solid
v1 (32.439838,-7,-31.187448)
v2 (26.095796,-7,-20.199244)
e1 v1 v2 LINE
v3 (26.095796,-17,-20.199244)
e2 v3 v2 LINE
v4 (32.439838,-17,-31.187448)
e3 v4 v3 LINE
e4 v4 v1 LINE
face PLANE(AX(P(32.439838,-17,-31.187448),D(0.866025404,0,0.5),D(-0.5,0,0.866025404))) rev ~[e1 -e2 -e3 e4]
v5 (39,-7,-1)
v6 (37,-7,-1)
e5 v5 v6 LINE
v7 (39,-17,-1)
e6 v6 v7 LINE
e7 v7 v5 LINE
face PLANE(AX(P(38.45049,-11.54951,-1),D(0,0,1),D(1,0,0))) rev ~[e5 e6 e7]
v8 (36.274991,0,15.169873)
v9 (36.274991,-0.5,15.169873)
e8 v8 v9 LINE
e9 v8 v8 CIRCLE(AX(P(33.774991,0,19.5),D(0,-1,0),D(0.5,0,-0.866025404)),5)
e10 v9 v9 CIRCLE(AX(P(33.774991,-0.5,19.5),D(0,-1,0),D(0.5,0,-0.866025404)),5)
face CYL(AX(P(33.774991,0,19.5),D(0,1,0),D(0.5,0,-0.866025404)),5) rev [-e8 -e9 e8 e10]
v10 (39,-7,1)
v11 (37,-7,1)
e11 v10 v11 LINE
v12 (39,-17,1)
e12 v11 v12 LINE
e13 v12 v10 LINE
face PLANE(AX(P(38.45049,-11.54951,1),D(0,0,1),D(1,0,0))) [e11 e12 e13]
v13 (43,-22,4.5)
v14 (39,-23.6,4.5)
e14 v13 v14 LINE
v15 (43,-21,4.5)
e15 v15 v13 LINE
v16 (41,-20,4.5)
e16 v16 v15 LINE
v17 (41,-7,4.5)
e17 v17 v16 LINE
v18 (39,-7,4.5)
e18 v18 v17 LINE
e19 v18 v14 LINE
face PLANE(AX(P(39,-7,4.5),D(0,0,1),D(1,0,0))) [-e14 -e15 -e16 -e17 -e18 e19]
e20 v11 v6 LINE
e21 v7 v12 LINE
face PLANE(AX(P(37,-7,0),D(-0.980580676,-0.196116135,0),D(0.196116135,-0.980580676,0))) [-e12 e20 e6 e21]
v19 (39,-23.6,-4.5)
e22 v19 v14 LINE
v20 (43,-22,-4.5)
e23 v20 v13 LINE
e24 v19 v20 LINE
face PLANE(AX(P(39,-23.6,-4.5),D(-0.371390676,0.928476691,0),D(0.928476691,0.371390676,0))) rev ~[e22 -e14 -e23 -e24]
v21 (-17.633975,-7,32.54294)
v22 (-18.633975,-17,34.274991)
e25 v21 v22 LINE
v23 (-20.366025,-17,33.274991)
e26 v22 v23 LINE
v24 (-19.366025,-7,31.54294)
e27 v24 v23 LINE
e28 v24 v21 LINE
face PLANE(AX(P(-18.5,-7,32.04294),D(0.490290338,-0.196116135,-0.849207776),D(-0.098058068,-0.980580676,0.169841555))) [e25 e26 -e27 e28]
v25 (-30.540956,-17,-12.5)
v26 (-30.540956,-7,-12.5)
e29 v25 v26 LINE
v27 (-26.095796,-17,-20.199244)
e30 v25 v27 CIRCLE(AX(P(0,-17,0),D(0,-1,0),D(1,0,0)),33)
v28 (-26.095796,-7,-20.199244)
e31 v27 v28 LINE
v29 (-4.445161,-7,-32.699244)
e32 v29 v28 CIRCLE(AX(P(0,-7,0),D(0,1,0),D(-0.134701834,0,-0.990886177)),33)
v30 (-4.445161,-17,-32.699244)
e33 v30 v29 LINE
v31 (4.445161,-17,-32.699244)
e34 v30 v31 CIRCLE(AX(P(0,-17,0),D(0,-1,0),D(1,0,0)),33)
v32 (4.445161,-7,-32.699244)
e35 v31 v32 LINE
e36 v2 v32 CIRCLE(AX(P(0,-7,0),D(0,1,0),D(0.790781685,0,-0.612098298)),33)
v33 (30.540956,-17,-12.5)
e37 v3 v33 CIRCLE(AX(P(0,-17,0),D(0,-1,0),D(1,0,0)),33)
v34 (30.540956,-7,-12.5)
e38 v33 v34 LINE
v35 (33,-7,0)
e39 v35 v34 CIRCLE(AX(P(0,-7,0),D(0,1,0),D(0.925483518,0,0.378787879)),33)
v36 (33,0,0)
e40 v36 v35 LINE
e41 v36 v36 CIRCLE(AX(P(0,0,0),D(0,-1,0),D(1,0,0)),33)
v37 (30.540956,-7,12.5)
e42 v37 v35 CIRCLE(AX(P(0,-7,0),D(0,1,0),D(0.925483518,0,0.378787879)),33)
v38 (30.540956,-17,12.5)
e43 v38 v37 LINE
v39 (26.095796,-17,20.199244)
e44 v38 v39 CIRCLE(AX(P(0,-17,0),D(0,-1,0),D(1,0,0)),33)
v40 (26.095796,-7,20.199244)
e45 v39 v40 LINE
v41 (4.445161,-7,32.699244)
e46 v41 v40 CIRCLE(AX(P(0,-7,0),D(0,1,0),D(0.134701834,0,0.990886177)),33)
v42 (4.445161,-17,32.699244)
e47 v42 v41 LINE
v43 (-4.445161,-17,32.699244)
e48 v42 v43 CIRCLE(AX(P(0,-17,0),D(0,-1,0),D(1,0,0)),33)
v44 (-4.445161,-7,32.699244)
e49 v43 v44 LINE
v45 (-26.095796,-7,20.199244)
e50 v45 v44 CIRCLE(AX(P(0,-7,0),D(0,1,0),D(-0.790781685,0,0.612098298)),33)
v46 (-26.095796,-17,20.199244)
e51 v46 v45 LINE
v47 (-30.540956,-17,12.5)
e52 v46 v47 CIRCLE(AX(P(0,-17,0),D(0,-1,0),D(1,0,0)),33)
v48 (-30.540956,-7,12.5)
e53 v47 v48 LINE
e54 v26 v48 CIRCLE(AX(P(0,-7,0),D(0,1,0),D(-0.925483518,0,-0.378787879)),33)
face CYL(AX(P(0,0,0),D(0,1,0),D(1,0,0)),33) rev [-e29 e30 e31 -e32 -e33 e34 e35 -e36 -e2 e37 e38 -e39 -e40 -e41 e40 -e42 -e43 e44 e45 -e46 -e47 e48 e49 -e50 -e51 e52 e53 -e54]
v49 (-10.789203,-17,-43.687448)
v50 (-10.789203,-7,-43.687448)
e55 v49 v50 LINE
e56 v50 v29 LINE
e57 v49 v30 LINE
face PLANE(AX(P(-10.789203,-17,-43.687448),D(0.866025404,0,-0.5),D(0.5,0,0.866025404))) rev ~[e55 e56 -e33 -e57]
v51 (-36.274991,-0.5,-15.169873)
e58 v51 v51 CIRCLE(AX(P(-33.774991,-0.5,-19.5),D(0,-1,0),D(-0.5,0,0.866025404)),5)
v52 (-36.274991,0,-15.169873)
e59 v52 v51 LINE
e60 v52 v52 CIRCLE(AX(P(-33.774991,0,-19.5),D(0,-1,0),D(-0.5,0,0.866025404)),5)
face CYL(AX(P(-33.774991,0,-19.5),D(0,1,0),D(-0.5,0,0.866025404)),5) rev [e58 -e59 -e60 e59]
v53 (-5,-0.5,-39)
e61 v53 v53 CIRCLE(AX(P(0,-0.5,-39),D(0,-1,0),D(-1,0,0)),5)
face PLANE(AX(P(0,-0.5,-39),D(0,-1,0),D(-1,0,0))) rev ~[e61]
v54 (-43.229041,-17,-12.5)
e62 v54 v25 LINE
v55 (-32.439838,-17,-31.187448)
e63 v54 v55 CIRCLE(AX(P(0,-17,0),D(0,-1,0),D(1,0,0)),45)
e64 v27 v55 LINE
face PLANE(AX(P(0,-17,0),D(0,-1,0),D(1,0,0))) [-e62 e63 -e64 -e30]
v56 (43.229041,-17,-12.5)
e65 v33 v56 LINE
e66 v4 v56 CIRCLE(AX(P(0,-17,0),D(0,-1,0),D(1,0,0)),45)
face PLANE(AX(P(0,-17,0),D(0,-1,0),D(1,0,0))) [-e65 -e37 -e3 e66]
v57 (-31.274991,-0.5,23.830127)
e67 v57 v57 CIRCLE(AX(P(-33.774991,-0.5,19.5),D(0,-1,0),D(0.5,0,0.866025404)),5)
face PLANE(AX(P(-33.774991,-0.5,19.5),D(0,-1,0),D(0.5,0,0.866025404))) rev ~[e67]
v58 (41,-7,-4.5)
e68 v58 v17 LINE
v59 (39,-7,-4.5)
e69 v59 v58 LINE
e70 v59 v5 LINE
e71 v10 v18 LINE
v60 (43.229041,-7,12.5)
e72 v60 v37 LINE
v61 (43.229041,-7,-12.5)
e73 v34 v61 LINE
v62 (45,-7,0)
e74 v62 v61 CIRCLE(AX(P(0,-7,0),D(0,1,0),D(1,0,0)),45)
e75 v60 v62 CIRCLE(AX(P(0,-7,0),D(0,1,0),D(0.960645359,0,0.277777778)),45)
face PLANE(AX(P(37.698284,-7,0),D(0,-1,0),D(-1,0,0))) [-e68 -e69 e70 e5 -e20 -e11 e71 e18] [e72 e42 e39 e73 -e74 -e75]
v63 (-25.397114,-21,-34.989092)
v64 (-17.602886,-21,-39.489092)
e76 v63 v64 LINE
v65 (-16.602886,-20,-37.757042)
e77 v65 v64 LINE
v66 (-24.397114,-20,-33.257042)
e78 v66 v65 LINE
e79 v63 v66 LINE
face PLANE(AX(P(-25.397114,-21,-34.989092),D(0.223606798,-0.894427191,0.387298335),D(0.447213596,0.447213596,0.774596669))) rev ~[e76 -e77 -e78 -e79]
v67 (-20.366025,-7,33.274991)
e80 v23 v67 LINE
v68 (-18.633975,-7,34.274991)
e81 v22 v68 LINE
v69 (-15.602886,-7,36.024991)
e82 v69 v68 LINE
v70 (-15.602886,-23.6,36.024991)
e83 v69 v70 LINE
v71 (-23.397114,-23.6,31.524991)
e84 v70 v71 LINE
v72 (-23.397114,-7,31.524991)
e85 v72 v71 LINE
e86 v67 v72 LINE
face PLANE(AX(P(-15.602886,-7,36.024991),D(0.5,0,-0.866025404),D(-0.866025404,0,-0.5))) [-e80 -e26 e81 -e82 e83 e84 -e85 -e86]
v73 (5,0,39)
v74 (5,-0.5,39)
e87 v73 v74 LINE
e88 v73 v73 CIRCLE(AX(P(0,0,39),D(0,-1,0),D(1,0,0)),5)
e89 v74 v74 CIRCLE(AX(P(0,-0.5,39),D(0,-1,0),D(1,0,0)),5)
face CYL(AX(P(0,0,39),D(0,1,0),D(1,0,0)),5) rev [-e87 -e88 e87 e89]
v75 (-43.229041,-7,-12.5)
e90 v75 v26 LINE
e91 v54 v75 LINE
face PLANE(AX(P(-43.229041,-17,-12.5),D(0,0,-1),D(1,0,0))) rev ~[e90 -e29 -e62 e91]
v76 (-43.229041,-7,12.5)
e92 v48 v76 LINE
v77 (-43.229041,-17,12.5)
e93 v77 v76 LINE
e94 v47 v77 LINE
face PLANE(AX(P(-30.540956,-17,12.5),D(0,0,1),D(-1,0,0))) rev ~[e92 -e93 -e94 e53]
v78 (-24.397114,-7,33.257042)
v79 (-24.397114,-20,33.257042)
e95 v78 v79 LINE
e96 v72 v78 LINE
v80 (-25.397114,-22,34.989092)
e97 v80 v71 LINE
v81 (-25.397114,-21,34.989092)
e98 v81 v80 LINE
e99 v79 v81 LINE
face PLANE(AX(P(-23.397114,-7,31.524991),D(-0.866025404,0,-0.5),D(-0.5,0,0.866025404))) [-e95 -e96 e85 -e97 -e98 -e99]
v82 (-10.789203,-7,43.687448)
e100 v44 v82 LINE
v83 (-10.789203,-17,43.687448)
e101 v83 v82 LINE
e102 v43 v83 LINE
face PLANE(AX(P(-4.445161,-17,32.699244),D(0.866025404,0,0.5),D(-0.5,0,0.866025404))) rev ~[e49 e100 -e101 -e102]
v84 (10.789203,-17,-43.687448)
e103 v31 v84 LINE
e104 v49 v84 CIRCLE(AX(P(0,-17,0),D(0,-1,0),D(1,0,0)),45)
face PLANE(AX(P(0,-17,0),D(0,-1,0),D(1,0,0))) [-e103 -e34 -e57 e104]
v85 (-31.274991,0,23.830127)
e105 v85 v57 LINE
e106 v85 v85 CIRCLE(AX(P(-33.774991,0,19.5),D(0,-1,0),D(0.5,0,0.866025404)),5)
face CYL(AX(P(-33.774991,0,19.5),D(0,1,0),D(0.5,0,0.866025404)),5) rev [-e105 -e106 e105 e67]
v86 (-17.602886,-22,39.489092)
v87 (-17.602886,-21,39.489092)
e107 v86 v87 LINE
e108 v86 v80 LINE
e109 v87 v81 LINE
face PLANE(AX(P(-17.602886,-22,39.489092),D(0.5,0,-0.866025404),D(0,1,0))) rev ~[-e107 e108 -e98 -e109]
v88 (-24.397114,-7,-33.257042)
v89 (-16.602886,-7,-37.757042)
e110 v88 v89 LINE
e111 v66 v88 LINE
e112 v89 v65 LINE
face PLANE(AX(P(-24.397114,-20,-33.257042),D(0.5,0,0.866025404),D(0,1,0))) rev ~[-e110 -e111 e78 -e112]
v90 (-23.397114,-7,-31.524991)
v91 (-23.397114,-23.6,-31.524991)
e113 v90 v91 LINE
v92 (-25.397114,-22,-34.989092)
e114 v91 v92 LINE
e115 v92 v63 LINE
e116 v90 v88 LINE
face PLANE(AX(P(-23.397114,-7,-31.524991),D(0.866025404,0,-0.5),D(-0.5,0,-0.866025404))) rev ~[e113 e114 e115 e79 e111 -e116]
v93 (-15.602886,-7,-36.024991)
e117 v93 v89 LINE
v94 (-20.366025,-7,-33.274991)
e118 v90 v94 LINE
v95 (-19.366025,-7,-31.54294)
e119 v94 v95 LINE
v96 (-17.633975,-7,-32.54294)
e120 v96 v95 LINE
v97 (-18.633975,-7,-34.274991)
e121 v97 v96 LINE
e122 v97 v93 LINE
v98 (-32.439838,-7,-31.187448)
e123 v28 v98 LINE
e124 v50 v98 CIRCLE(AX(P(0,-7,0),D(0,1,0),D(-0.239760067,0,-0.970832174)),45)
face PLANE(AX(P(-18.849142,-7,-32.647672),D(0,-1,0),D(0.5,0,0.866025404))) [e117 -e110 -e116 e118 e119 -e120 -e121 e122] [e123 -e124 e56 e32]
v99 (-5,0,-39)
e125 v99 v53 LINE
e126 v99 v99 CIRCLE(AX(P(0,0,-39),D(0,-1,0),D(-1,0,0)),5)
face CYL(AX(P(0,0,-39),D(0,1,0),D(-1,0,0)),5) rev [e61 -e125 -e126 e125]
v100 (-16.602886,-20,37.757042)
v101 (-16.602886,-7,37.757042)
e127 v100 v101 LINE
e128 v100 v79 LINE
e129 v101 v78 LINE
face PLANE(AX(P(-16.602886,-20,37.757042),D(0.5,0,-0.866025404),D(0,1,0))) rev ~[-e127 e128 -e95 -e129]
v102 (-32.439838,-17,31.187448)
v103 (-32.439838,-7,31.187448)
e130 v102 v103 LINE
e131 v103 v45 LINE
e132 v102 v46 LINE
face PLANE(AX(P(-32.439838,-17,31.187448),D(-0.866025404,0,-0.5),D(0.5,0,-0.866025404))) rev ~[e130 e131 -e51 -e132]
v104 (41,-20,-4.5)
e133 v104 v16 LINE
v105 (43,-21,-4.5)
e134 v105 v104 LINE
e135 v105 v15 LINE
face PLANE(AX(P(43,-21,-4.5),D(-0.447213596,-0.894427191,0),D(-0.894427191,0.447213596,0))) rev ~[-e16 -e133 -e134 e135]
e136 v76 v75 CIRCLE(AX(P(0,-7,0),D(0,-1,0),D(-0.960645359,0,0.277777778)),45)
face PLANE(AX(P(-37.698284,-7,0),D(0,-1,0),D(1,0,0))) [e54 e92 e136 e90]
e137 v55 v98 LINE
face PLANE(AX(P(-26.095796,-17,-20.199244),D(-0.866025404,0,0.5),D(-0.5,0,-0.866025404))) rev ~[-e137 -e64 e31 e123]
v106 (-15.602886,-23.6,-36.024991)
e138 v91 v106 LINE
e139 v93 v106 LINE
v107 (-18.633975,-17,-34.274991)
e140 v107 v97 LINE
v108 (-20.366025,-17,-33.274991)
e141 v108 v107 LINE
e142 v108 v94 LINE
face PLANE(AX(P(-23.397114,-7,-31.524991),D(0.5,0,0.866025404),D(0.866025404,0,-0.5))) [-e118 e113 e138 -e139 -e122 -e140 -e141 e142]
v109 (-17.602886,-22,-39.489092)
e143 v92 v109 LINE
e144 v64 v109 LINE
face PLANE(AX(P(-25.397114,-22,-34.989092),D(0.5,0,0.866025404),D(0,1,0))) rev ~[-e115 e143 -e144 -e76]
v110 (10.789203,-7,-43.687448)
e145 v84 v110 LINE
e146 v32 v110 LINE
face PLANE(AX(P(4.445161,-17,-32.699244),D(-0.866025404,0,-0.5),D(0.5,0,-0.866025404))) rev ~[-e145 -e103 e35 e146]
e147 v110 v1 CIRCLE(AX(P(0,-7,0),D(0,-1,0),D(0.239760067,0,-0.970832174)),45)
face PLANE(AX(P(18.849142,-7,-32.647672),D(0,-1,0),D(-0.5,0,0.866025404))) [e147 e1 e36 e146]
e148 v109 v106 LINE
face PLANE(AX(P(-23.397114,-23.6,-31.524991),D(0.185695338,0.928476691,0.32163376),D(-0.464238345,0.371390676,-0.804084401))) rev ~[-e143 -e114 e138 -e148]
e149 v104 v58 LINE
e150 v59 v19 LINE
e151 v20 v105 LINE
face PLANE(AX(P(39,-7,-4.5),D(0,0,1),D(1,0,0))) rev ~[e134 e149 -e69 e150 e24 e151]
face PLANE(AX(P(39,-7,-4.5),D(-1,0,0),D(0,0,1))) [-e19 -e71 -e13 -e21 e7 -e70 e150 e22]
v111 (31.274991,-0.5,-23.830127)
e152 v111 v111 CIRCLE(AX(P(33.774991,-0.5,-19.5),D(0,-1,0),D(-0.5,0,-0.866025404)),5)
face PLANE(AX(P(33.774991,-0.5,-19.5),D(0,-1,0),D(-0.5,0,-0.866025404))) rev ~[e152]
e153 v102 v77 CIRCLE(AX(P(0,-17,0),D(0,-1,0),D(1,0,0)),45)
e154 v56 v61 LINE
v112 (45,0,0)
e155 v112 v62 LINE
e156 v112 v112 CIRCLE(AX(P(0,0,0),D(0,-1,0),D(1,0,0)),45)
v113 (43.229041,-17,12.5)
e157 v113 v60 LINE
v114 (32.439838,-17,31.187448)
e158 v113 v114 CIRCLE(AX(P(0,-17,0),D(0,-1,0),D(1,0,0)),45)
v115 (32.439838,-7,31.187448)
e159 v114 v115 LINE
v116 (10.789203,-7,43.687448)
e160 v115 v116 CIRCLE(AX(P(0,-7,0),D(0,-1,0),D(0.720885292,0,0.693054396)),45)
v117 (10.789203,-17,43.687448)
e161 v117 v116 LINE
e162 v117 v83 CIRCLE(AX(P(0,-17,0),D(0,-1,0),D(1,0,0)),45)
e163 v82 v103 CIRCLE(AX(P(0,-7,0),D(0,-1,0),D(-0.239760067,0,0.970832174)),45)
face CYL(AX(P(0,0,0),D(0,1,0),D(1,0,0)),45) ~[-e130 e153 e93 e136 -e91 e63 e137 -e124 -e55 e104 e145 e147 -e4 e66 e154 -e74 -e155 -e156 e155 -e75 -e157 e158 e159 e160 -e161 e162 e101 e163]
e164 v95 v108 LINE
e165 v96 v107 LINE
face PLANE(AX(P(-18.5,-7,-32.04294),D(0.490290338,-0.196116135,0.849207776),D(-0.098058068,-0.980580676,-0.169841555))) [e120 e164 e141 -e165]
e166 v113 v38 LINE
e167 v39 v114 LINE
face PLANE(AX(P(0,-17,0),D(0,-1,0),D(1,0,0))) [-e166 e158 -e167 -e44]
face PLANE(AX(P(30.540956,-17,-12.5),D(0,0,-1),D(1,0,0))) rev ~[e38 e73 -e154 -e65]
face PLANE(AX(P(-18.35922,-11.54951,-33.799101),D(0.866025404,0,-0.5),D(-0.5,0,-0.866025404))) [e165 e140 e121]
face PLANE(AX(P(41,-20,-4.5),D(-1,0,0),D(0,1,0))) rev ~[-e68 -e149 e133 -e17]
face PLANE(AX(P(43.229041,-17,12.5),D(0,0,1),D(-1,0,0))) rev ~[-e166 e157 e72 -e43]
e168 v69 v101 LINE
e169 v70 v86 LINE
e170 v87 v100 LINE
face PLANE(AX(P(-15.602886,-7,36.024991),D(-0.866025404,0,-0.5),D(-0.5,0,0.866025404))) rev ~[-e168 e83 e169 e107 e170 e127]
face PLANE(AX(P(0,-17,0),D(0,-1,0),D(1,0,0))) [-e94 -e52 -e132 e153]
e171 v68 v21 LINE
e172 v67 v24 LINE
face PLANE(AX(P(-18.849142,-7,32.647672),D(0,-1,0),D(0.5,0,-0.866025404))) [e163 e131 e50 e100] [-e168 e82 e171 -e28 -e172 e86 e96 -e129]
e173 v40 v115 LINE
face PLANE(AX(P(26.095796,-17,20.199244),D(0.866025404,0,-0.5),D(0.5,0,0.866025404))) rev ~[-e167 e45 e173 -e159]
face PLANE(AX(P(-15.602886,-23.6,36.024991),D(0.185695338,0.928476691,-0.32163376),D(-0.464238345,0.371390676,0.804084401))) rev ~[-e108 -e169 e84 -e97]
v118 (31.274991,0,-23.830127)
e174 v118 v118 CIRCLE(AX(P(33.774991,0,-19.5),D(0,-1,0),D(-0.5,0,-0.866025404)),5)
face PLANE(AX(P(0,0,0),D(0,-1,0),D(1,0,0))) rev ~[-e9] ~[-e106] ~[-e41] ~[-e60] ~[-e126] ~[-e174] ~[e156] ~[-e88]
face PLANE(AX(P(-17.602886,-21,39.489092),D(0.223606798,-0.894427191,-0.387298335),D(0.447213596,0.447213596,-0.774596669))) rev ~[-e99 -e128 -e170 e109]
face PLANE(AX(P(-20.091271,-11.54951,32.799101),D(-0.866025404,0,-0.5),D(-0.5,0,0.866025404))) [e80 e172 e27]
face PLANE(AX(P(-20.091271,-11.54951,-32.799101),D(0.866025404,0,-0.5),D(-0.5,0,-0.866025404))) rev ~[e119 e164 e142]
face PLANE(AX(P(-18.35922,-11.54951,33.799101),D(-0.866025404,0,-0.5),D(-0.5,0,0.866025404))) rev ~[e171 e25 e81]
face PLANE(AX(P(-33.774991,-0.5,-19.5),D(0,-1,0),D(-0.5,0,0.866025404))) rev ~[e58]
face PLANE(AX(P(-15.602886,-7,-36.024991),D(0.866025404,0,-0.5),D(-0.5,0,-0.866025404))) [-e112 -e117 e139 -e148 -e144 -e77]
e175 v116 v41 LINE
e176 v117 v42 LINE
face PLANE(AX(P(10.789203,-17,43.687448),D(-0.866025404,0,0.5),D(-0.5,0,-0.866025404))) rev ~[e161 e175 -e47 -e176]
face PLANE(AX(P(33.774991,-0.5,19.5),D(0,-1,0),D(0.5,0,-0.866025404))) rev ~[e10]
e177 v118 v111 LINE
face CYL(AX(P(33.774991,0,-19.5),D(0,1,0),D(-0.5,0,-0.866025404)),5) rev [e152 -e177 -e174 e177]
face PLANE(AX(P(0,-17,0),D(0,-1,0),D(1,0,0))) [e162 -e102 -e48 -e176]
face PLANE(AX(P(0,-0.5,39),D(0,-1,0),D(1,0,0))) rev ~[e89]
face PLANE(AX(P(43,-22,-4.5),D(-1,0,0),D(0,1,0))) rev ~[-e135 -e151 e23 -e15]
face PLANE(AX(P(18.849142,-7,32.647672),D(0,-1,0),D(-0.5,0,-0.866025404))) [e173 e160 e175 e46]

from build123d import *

# Parameters (mm, degrees)
F0_R             = 45
F0_R_2           = 33
F1_DEPTH         = 17
F2_R             = 5
F3_DEPTH         = 0.5
F3_COPIES_COUNT  = 6
F6_DEPTH         = 10
F8_COUNT         = 6
F9_W             = 6
F9_H             = 9
F10_DEPTH        = 17
F10_COPIES_COUNT = 3
F12_DEPTH        = 10
F12_COPIES_COUNT = 3
F14_DEPTH        = 1
F14_COPIES_COUNT = 3


# Not quite as in the source:
# - a pattern or mirror of a feature is missing from the dataset's text; its kind, count and spacing are read off the source's solid
# - a feature names something its author has since deleted; it is built from what else it names


with BuildPart() as f1:
    # F0 (on Front) → F1 (new body)
    with BuildSketch(Plane.XZ):
        Circle(F0_R)
        Circle(F0_R_2, mode=Mode.SUBTRACT)
    extrude(amount=F1_DEPTH)

    # F2 (on Front) → F3 (cut)
    with BuildSketch(Plane.XZ):
        with Locations((0, 39)):
            Circle(F2_R)
    f3 = extrude(amount=F3_DEPTH, mode=Mode.SUBTRACT)

    # F3_copies: F3 ×6 about axis
    f3_copies_axis = Axis((0, 0, 0), (0, 1, 0))
    for i in range(1, F3_COPIES_COUNT):
        add(f3.rotate(f3_copies_axis, i * 360 / F3_COPIES_COUNT), mode=Mode.SUBTRACT)

    # F5 (on face) → F6 (cut)
    with BuildSketch(Plane.XZ.offset(17)):
        with BuildLine():
            Line((-30.5409561082, 12.5), (-43.2290411645, 12.5))
            ThreePointArc((-43.2290411645, 12.5), (-45, 0), (-43.2290411645, -12.5))
            Line((-43.2290411645, -12.5), (-30.5409561082, -12.5))
            ThreePointArc((-30.5409561082, -12.5), (-33, 0), (-30.5409561082, 12.5))
        make_face()
    f6 = extrude(amount=-F6_DEPTH, mode=Mode.SUBTRACT)

    # F8: F6 ×6 about axis
    f8_axis = Axis((0, -20.116, 0), (0, -1, 0))
    for i in range(1, F8_COUNT):
        add(f6.rotate(f8_axis, i * 360 / F8_COUNT), mode=Mode.SUBTRACT)

    # F9 (on face) → F10 (join)
    with BuildSketch(Plane.XZ.offset(7)):
        with Locations((42, 0)):
            Rectangle(F9_W, F9_H)
    f10 = extrude(amount=F10_DEPTH)

    # F10_copies: F10 ×3 about axis
    f10_copies_axis = Axis((0, 0, 0), (0, 1, 0))
    for i in range(1, F10_COPIES_COUNT):
        add(f10.rotate(f10_copies_axis, i * 360 / F10_COPIES_COUNT))

    # F11 (on face) → F12 (cut)
    with BuildSketch(Plane(origin=(0, 0, -4.5), x_dir=(1, 0, 0), z_dir=(0, 0, -1))):
        Polygon((39, 24), (39, 23.6), (43, 22), (43, 21), (41, 20), (41, 7), (44.7744346698, 7), (45, 7), (45, 24), align=None)
    f12 = extrude(amount=-F12_DEPTH, mode=Mode.SUBTRACT)

    # F12_copies: F12 ×3 about axis
    f12_copies_axis = Axis((0, 0, 0), (0, 1, 0))
    for i in range(1, F12_COPIES_COUNT):
        add(f12.rotate(f12_copies_axis, i * 360 / F12_COPIES_COUNT), mode=Mode.SUBTRACT)

    # F13 (on Top) → F14 (join, symmetric)
    with BuildSketch(Plane.XY):
        Polygon((37, -7), (39, -17), (39, -7), align=None)
    f14 = extrude(amount=F14_DEPTH, both=True)

    # F14_copies: F14 ×3 about axis
    f14_copies_axis = Axis((0, 0, 0), (0, 1, 0))
    for i in range(1, F14_COPIES_COUNT):
        add(f14.rotate(f14_copies_axis, i * 360 / F14_COPIES_COUNT))


solid = f1.part
